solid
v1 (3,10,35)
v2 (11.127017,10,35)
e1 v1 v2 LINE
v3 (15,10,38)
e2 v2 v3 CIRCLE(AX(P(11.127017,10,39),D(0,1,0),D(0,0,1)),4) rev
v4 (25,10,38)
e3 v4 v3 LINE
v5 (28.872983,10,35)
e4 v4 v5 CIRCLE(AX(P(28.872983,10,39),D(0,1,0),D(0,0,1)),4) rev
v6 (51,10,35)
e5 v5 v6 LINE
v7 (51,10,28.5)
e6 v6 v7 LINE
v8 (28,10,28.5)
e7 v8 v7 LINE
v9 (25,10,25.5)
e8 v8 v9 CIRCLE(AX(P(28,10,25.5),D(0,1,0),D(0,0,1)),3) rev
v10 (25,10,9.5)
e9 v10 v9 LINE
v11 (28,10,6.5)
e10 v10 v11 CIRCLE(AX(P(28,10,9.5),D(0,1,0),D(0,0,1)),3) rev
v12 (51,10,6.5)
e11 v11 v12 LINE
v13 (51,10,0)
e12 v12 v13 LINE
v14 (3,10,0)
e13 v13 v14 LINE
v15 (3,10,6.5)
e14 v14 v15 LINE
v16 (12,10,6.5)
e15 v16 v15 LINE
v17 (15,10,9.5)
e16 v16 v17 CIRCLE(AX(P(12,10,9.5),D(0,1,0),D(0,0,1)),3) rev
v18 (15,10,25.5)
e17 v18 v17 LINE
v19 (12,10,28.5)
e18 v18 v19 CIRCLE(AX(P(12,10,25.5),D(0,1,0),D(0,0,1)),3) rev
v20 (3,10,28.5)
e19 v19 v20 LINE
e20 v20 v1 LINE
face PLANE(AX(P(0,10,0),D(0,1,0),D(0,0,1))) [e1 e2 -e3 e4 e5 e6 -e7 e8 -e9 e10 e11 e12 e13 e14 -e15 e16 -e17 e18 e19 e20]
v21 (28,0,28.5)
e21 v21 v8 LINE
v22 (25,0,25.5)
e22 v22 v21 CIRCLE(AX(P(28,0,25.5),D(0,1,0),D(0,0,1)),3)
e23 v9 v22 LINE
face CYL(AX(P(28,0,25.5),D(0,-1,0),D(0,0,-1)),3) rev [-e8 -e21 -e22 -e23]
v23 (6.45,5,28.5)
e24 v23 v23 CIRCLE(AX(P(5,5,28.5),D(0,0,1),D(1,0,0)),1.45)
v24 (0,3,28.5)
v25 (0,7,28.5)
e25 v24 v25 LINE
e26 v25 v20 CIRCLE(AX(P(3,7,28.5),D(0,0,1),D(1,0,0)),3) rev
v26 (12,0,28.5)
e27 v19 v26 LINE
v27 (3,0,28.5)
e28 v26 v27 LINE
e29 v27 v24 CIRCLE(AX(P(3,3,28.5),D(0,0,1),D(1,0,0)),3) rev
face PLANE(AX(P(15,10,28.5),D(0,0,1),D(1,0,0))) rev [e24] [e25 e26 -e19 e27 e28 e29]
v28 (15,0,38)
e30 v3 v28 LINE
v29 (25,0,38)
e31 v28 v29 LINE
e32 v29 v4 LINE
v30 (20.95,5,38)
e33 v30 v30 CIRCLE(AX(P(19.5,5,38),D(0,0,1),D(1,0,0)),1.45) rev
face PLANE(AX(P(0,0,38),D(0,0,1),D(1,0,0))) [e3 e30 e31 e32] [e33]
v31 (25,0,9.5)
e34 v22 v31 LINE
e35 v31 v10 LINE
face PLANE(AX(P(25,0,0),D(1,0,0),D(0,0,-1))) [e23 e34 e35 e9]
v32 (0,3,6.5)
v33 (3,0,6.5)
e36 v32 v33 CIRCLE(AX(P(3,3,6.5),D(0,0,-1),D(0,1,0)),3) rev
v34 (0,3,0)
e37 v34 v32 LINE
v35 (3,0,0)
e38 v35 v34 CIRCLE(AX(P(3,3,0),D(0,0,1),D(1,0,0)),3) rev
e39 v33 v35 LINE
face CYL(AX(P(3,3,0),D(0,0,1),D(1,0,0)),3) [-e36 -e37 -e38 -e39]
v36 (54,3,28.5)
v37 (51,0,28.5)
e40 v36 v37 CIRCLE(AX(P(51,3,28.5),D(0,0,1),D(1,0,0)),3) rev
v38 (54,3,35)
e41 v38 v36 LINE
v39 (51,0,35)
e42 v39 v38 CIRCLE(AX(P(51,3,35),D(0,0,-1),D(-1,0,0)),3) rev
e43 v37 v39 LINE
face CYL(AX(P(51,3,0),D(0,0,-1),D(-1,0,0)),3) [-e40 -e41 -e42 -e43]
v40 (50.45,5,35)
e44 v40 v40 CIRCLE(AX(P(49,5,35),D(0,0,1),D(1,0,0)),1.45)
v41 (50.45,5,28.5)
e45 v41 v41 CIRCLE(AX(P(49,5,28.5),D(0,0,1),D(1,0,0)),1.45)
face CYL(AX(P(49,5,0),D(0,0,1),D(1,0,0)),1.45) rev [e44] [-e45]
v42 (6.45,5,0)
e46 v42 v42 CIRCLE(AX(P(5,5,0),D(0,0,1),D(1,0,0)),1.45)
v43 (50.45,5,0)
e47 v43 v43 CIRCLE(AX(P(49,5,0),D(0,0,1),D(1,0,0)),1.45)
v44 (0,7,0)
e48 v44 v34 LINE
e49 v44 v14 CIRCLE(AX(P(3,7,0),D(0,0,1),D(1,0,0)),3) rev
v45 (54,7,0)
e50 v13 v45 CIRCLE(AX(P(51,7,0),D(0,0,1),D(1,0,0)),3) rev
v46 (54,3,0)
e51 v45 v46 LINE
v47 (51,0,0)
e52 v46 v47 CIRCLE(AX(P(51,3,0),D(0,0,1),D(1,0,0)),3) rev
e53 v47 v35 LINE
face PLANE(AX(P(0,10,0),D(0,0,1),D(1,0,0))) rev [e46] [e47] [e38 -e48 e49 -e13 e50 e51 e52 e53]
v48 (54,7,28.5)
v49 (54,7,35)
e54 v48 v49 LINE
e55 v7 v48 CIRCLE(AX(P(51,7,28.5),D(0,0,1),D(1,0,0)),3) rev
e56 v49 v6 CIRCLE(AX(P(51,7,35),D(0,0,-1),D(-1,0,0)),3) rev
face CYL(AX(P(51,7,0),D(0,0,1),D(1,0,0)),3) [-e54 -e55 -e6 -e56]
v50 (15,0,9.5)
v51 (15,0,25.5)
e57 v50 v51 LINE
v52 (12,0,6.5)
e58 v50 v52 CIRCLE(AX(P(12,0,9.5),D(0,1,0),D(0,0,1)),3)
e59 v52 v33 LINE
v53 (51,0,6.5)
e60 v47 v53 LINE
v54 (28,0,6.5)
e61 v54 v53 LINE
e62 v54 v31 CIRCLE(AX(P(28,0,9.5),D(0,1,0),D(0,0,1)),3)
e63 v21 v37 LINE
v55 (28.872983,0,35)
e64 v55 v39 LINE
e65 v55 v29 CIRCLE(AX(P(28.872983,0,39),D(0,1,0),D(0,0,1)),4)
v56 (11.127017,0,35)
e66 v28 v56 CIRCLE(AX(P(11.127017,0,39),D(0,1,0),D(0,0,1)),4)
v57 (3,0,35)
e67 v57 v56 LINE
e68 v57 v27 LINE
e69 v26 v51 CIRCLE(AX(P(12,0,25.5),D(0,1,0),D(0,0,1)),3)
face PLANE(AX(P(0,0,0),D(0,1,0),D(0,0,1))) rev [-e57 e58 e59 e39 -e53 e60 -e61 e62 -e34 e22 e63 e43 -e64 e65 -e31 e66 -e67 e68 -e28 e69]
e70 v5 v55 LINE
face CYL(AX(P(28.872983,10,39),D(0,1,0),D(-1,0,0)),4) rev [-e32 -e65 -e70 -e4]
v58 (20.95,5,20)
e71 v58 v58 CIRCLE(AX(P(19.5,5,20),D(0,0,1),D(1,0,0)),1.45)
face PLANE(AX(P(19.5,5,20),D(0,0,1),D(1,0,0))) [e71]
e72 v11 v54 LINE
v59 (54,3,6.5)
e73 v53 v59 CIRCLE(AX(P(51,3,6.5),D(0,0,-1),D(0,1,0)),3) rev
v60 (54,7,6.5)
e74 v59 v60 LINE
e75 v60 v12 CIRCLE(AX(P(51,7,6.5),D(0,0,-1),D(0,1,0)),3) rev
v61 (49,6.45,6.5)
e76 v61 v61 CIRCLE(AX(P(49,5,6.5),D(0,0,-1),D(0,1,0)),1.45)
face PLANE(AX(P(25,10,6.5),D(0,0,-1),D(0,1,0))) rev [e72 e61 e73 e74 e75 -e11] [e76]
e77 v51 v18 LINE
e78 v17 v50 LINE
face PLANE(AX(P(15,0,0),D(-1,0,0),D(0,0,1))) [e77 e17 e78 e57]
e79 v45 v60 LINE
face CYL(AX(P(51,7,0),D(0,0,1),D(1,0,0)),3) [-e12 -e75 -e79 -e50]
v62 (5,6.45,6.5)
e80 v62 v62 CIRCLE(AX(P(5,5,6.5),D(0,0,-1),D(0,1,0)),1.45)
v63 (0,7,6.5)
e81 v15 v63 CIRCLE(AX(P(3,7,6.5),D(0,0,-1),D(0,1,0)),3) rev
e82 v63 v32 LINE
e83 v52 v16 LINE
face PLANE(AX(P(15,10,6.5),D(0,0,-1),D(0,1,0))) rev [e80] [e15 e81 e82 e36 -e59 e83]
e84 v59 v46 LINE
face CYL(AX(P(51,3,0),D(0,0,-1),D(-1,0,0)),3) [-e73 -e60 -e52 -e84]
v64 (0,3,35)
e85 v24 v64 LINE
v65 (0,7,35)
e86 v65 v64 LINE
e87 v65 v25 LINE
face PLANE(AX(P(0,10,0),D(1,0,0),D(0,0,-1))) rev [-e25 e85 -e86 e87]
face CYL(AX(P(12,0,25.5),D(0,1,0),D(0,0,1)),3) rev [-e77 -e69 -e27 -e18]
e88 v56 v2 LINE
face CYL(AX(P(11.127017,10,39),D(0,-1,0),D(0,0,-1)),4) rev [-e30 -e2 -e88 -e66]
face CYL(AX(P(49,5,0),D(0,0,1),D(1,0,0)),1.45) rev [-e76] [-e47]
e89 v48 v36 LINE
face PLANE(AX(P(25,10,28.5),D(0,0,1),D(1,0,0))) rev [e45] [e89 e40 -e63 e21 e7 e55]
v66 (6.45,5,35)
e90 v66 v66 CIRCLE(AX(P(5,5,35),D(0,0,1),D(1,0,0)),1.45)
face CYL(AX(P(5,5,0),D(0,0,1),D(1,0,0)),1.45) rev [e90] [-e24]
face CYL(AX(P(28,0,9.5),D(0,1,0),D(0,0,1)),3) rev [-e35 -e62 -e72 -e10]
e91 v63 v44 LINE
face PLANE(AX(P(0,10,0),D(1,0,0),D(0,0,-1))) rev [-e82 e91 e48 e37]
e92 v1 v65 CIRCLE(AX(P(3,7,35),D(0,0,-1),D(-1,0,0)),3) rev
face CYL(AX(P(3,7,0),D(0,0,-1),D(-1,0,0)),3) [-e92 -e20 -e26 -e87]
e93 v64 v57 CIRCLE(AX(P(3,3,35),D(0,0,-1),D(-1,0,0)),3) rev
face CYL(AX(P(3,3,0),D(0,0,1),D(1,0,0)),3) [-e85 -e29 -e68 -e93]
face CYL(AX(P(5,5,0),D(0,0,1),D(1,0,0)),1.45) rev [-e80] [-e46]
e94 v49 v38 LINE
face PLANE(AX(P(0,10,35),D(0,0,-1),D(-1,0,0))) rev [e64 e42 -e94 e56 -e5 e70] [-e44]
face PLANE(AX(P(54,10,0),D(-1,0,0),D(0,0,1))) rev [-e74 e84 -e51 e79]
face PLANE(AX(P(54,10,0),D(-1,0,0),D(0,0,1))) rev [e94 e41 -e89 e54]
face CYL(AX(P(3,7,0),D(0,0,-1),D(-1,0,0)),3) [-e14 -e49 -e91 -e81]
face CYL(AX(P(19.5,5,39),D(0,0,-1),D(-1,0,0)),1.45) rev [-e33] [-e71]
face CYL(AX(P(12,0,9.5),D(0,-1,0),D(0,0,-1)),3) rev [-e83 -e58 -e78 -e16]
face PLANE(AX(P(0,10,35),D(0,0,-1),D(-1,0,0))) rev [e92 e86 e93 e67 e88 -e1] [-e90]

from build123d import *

# Parameters (mm, degrees)
SKETCH1_W               = 54
SKETCH1_H               = 35
BOSS_EXTRUDE1_DEPTH     = 10
SKETCH2_W               = 22
SKETCH2_H               = 10
CUT_EXTRUDE1_DEPTH      = 29
SKETCH3_W               = 22
SKETCH3_H               = 10
CUT_EXTRUDE2_DEPTH      = 15
SKETCH5_R               = 1.45
CUT_EXTRUDE4_DEPTH      = 66.122960621
FILLET1_R               = 3
FILLET2_R               = 3
SKETCH8_W               = 10
SKETCH8_H               = 10
BOSS_EXTRUDE2_DEPTH     = 3
CUT_EXTRUDE5_DEPTH      = 4
CUT_EXTRUDE5_DEPTH_BACK = 15
SKETCH6_R               = 1.45
FILLET3_R               = 4


with BuildPart() as part:
    # Sketch1 → Boss-Extrude1 (new body)
    with BuildSketch(Plane(origin=(0, 0, 0), x_dir=(1, 0, 0), z_dir=(0, 1, 0))):
        with Locations((27, -17.5)):
            Rectangle(SKETCH1_W, SKETCH1_H)
    extrude(amount=BOSS_EXTRUDE1_DEPTH)

    # Sketch2 → Cut-Extrude1 (cut)
    with BuildSketch(Plane(origin=(54, 0, 0), x_dir=(0, 0, -1), z_dir=(1, 0, 0))):
        with Locations((-17.5, 5)):
            Rectangle(SKETCH2_W, SKETCH2_H)
    extrude(amount=-CUT_EXTRUDE1_DEPTH, mode=Mode.SUBTRACT)

    # Sketch3 → Cut-Extrude2 (cut)
    with BuildSketch(Plane.ZY):
        with Locations((17.5, 5)):
            Rectangle(SKETCH3_W, SKETCH3_H)
    extrude(amount=-CUT_EXTRUDE2_DEPTH, mode=Mode.SUBTRACT)

    # Sketch5 → Cut-Extrude4 (cut, through all)
    with BuildSketch(Plane.XY.offset(35)):
        with Locations((5, 5)):
            Circle(SKETCH5_R)
        with Locations((49, 5)):
            Circle(SKETCH5_R)
    extrude(amount=-CUT_EXTRUDE4_DEPTH, mode=Mode.SUBTRACT)

    # Fillet1
    fillet1_edges = [part.edges().sort_by_distance(p)[0] for p in [
        (54, 10, 31.75),
        (54, 0, 3.25),
        (54, 10, 3.25),
        (0, 0, 31.75),
        (0, 10, 31.75),
        (0, 10, 3.25),
        (54, 0, 31.75),
        (0, 0, 3.25),
    ]]
    fillet(fillet1_edges, radius=FILLET1_R)

    # Fillet2
    fillet2_edges = [part.edges().sort_by_distance(p)[0] for p in [
        (25, 5, 28.5),
        (25, 5, 6.5),
        (15, 5, 6.5),
        (15, 5, 28.5),
    ]]
    fillet(fillet2_edges, radius=FILLET2_R)

    # Sketch8 → Boss-Extrude2 (add)
    with BuildSketch(Plane.XY.offset(35)):
        with Locations((20, 5)):
            Rectangle(SKETCH8_W, SKETCH8_H)
    extrude(amount=BOSS_EXTRUDE2_DEPTH)

    # Sketch6 → Cut-Extrude5 (cut, two sides: drawn at the far end of the back side and taken through both)
    with BuildSketch(Plane.XY.offset(35).offset(-CUT_EXTRUDE5_DEPTH_BACK)):
        with Locations((19.5, 5)):
            Circle(SKETCH6_R)
    extrude(amount=CUT_EXTRUDE5_DEPTH + CUT_EXTRUDE5_DEPTH_BACK, mode=Mode.SUBTRACT)

    # Fillet3
    # the kernel refuses this fillet: 4 mm, written as the material it adds along each edge
    with BuildSketch(Plane(origin=(25, 10, 35), x_dir=(0, 0, 1), z_dir=(0, -1, 0))) as fillet3_piece_1:
        with BuildLine():
            CenterArc((4, -3.872983346), FILLET3_R, 104.477512186, 75.522487814)
            Line((0, -3.872983346), (-0.08, -3.872983346))
            Line((-0.08, -3.872983346), (-0.08, 0))
            Line((-0.08, 0), (0, 0.08))
            ThreePointArc((0, 0.08), (1.5, 0.08), (2.98, 0.077459667))
            Line((2.98, 0.077459667), (3, 0))
        make_face()
    extrude(amount=10)
    with BuildSketch(Plane(origin=(15, 0, 35), x_dir=(-1, 0, 0), z_dir=(0, 1, 0))) as fillet3_piece_2:
        with BuildLine():
            CenterArc((3.872983346, 4), FILLET3_R, 194.477512186, 75.522487814)
            Line((0, 3), (-0.077459667, 2.98))
            ThreePointArc((-0.077459667, 2.98), (-0.08, 1.5), (-0.08, 0))
            Line((-0.08, 0), (0, -0.08))
            Line((0, -0.08), (3.872983346, -0.08))
            Line((3.872983346, -0.08), (3.872983346, 0))
        make_face()
    extrude(amount=10)


solid = part.part
